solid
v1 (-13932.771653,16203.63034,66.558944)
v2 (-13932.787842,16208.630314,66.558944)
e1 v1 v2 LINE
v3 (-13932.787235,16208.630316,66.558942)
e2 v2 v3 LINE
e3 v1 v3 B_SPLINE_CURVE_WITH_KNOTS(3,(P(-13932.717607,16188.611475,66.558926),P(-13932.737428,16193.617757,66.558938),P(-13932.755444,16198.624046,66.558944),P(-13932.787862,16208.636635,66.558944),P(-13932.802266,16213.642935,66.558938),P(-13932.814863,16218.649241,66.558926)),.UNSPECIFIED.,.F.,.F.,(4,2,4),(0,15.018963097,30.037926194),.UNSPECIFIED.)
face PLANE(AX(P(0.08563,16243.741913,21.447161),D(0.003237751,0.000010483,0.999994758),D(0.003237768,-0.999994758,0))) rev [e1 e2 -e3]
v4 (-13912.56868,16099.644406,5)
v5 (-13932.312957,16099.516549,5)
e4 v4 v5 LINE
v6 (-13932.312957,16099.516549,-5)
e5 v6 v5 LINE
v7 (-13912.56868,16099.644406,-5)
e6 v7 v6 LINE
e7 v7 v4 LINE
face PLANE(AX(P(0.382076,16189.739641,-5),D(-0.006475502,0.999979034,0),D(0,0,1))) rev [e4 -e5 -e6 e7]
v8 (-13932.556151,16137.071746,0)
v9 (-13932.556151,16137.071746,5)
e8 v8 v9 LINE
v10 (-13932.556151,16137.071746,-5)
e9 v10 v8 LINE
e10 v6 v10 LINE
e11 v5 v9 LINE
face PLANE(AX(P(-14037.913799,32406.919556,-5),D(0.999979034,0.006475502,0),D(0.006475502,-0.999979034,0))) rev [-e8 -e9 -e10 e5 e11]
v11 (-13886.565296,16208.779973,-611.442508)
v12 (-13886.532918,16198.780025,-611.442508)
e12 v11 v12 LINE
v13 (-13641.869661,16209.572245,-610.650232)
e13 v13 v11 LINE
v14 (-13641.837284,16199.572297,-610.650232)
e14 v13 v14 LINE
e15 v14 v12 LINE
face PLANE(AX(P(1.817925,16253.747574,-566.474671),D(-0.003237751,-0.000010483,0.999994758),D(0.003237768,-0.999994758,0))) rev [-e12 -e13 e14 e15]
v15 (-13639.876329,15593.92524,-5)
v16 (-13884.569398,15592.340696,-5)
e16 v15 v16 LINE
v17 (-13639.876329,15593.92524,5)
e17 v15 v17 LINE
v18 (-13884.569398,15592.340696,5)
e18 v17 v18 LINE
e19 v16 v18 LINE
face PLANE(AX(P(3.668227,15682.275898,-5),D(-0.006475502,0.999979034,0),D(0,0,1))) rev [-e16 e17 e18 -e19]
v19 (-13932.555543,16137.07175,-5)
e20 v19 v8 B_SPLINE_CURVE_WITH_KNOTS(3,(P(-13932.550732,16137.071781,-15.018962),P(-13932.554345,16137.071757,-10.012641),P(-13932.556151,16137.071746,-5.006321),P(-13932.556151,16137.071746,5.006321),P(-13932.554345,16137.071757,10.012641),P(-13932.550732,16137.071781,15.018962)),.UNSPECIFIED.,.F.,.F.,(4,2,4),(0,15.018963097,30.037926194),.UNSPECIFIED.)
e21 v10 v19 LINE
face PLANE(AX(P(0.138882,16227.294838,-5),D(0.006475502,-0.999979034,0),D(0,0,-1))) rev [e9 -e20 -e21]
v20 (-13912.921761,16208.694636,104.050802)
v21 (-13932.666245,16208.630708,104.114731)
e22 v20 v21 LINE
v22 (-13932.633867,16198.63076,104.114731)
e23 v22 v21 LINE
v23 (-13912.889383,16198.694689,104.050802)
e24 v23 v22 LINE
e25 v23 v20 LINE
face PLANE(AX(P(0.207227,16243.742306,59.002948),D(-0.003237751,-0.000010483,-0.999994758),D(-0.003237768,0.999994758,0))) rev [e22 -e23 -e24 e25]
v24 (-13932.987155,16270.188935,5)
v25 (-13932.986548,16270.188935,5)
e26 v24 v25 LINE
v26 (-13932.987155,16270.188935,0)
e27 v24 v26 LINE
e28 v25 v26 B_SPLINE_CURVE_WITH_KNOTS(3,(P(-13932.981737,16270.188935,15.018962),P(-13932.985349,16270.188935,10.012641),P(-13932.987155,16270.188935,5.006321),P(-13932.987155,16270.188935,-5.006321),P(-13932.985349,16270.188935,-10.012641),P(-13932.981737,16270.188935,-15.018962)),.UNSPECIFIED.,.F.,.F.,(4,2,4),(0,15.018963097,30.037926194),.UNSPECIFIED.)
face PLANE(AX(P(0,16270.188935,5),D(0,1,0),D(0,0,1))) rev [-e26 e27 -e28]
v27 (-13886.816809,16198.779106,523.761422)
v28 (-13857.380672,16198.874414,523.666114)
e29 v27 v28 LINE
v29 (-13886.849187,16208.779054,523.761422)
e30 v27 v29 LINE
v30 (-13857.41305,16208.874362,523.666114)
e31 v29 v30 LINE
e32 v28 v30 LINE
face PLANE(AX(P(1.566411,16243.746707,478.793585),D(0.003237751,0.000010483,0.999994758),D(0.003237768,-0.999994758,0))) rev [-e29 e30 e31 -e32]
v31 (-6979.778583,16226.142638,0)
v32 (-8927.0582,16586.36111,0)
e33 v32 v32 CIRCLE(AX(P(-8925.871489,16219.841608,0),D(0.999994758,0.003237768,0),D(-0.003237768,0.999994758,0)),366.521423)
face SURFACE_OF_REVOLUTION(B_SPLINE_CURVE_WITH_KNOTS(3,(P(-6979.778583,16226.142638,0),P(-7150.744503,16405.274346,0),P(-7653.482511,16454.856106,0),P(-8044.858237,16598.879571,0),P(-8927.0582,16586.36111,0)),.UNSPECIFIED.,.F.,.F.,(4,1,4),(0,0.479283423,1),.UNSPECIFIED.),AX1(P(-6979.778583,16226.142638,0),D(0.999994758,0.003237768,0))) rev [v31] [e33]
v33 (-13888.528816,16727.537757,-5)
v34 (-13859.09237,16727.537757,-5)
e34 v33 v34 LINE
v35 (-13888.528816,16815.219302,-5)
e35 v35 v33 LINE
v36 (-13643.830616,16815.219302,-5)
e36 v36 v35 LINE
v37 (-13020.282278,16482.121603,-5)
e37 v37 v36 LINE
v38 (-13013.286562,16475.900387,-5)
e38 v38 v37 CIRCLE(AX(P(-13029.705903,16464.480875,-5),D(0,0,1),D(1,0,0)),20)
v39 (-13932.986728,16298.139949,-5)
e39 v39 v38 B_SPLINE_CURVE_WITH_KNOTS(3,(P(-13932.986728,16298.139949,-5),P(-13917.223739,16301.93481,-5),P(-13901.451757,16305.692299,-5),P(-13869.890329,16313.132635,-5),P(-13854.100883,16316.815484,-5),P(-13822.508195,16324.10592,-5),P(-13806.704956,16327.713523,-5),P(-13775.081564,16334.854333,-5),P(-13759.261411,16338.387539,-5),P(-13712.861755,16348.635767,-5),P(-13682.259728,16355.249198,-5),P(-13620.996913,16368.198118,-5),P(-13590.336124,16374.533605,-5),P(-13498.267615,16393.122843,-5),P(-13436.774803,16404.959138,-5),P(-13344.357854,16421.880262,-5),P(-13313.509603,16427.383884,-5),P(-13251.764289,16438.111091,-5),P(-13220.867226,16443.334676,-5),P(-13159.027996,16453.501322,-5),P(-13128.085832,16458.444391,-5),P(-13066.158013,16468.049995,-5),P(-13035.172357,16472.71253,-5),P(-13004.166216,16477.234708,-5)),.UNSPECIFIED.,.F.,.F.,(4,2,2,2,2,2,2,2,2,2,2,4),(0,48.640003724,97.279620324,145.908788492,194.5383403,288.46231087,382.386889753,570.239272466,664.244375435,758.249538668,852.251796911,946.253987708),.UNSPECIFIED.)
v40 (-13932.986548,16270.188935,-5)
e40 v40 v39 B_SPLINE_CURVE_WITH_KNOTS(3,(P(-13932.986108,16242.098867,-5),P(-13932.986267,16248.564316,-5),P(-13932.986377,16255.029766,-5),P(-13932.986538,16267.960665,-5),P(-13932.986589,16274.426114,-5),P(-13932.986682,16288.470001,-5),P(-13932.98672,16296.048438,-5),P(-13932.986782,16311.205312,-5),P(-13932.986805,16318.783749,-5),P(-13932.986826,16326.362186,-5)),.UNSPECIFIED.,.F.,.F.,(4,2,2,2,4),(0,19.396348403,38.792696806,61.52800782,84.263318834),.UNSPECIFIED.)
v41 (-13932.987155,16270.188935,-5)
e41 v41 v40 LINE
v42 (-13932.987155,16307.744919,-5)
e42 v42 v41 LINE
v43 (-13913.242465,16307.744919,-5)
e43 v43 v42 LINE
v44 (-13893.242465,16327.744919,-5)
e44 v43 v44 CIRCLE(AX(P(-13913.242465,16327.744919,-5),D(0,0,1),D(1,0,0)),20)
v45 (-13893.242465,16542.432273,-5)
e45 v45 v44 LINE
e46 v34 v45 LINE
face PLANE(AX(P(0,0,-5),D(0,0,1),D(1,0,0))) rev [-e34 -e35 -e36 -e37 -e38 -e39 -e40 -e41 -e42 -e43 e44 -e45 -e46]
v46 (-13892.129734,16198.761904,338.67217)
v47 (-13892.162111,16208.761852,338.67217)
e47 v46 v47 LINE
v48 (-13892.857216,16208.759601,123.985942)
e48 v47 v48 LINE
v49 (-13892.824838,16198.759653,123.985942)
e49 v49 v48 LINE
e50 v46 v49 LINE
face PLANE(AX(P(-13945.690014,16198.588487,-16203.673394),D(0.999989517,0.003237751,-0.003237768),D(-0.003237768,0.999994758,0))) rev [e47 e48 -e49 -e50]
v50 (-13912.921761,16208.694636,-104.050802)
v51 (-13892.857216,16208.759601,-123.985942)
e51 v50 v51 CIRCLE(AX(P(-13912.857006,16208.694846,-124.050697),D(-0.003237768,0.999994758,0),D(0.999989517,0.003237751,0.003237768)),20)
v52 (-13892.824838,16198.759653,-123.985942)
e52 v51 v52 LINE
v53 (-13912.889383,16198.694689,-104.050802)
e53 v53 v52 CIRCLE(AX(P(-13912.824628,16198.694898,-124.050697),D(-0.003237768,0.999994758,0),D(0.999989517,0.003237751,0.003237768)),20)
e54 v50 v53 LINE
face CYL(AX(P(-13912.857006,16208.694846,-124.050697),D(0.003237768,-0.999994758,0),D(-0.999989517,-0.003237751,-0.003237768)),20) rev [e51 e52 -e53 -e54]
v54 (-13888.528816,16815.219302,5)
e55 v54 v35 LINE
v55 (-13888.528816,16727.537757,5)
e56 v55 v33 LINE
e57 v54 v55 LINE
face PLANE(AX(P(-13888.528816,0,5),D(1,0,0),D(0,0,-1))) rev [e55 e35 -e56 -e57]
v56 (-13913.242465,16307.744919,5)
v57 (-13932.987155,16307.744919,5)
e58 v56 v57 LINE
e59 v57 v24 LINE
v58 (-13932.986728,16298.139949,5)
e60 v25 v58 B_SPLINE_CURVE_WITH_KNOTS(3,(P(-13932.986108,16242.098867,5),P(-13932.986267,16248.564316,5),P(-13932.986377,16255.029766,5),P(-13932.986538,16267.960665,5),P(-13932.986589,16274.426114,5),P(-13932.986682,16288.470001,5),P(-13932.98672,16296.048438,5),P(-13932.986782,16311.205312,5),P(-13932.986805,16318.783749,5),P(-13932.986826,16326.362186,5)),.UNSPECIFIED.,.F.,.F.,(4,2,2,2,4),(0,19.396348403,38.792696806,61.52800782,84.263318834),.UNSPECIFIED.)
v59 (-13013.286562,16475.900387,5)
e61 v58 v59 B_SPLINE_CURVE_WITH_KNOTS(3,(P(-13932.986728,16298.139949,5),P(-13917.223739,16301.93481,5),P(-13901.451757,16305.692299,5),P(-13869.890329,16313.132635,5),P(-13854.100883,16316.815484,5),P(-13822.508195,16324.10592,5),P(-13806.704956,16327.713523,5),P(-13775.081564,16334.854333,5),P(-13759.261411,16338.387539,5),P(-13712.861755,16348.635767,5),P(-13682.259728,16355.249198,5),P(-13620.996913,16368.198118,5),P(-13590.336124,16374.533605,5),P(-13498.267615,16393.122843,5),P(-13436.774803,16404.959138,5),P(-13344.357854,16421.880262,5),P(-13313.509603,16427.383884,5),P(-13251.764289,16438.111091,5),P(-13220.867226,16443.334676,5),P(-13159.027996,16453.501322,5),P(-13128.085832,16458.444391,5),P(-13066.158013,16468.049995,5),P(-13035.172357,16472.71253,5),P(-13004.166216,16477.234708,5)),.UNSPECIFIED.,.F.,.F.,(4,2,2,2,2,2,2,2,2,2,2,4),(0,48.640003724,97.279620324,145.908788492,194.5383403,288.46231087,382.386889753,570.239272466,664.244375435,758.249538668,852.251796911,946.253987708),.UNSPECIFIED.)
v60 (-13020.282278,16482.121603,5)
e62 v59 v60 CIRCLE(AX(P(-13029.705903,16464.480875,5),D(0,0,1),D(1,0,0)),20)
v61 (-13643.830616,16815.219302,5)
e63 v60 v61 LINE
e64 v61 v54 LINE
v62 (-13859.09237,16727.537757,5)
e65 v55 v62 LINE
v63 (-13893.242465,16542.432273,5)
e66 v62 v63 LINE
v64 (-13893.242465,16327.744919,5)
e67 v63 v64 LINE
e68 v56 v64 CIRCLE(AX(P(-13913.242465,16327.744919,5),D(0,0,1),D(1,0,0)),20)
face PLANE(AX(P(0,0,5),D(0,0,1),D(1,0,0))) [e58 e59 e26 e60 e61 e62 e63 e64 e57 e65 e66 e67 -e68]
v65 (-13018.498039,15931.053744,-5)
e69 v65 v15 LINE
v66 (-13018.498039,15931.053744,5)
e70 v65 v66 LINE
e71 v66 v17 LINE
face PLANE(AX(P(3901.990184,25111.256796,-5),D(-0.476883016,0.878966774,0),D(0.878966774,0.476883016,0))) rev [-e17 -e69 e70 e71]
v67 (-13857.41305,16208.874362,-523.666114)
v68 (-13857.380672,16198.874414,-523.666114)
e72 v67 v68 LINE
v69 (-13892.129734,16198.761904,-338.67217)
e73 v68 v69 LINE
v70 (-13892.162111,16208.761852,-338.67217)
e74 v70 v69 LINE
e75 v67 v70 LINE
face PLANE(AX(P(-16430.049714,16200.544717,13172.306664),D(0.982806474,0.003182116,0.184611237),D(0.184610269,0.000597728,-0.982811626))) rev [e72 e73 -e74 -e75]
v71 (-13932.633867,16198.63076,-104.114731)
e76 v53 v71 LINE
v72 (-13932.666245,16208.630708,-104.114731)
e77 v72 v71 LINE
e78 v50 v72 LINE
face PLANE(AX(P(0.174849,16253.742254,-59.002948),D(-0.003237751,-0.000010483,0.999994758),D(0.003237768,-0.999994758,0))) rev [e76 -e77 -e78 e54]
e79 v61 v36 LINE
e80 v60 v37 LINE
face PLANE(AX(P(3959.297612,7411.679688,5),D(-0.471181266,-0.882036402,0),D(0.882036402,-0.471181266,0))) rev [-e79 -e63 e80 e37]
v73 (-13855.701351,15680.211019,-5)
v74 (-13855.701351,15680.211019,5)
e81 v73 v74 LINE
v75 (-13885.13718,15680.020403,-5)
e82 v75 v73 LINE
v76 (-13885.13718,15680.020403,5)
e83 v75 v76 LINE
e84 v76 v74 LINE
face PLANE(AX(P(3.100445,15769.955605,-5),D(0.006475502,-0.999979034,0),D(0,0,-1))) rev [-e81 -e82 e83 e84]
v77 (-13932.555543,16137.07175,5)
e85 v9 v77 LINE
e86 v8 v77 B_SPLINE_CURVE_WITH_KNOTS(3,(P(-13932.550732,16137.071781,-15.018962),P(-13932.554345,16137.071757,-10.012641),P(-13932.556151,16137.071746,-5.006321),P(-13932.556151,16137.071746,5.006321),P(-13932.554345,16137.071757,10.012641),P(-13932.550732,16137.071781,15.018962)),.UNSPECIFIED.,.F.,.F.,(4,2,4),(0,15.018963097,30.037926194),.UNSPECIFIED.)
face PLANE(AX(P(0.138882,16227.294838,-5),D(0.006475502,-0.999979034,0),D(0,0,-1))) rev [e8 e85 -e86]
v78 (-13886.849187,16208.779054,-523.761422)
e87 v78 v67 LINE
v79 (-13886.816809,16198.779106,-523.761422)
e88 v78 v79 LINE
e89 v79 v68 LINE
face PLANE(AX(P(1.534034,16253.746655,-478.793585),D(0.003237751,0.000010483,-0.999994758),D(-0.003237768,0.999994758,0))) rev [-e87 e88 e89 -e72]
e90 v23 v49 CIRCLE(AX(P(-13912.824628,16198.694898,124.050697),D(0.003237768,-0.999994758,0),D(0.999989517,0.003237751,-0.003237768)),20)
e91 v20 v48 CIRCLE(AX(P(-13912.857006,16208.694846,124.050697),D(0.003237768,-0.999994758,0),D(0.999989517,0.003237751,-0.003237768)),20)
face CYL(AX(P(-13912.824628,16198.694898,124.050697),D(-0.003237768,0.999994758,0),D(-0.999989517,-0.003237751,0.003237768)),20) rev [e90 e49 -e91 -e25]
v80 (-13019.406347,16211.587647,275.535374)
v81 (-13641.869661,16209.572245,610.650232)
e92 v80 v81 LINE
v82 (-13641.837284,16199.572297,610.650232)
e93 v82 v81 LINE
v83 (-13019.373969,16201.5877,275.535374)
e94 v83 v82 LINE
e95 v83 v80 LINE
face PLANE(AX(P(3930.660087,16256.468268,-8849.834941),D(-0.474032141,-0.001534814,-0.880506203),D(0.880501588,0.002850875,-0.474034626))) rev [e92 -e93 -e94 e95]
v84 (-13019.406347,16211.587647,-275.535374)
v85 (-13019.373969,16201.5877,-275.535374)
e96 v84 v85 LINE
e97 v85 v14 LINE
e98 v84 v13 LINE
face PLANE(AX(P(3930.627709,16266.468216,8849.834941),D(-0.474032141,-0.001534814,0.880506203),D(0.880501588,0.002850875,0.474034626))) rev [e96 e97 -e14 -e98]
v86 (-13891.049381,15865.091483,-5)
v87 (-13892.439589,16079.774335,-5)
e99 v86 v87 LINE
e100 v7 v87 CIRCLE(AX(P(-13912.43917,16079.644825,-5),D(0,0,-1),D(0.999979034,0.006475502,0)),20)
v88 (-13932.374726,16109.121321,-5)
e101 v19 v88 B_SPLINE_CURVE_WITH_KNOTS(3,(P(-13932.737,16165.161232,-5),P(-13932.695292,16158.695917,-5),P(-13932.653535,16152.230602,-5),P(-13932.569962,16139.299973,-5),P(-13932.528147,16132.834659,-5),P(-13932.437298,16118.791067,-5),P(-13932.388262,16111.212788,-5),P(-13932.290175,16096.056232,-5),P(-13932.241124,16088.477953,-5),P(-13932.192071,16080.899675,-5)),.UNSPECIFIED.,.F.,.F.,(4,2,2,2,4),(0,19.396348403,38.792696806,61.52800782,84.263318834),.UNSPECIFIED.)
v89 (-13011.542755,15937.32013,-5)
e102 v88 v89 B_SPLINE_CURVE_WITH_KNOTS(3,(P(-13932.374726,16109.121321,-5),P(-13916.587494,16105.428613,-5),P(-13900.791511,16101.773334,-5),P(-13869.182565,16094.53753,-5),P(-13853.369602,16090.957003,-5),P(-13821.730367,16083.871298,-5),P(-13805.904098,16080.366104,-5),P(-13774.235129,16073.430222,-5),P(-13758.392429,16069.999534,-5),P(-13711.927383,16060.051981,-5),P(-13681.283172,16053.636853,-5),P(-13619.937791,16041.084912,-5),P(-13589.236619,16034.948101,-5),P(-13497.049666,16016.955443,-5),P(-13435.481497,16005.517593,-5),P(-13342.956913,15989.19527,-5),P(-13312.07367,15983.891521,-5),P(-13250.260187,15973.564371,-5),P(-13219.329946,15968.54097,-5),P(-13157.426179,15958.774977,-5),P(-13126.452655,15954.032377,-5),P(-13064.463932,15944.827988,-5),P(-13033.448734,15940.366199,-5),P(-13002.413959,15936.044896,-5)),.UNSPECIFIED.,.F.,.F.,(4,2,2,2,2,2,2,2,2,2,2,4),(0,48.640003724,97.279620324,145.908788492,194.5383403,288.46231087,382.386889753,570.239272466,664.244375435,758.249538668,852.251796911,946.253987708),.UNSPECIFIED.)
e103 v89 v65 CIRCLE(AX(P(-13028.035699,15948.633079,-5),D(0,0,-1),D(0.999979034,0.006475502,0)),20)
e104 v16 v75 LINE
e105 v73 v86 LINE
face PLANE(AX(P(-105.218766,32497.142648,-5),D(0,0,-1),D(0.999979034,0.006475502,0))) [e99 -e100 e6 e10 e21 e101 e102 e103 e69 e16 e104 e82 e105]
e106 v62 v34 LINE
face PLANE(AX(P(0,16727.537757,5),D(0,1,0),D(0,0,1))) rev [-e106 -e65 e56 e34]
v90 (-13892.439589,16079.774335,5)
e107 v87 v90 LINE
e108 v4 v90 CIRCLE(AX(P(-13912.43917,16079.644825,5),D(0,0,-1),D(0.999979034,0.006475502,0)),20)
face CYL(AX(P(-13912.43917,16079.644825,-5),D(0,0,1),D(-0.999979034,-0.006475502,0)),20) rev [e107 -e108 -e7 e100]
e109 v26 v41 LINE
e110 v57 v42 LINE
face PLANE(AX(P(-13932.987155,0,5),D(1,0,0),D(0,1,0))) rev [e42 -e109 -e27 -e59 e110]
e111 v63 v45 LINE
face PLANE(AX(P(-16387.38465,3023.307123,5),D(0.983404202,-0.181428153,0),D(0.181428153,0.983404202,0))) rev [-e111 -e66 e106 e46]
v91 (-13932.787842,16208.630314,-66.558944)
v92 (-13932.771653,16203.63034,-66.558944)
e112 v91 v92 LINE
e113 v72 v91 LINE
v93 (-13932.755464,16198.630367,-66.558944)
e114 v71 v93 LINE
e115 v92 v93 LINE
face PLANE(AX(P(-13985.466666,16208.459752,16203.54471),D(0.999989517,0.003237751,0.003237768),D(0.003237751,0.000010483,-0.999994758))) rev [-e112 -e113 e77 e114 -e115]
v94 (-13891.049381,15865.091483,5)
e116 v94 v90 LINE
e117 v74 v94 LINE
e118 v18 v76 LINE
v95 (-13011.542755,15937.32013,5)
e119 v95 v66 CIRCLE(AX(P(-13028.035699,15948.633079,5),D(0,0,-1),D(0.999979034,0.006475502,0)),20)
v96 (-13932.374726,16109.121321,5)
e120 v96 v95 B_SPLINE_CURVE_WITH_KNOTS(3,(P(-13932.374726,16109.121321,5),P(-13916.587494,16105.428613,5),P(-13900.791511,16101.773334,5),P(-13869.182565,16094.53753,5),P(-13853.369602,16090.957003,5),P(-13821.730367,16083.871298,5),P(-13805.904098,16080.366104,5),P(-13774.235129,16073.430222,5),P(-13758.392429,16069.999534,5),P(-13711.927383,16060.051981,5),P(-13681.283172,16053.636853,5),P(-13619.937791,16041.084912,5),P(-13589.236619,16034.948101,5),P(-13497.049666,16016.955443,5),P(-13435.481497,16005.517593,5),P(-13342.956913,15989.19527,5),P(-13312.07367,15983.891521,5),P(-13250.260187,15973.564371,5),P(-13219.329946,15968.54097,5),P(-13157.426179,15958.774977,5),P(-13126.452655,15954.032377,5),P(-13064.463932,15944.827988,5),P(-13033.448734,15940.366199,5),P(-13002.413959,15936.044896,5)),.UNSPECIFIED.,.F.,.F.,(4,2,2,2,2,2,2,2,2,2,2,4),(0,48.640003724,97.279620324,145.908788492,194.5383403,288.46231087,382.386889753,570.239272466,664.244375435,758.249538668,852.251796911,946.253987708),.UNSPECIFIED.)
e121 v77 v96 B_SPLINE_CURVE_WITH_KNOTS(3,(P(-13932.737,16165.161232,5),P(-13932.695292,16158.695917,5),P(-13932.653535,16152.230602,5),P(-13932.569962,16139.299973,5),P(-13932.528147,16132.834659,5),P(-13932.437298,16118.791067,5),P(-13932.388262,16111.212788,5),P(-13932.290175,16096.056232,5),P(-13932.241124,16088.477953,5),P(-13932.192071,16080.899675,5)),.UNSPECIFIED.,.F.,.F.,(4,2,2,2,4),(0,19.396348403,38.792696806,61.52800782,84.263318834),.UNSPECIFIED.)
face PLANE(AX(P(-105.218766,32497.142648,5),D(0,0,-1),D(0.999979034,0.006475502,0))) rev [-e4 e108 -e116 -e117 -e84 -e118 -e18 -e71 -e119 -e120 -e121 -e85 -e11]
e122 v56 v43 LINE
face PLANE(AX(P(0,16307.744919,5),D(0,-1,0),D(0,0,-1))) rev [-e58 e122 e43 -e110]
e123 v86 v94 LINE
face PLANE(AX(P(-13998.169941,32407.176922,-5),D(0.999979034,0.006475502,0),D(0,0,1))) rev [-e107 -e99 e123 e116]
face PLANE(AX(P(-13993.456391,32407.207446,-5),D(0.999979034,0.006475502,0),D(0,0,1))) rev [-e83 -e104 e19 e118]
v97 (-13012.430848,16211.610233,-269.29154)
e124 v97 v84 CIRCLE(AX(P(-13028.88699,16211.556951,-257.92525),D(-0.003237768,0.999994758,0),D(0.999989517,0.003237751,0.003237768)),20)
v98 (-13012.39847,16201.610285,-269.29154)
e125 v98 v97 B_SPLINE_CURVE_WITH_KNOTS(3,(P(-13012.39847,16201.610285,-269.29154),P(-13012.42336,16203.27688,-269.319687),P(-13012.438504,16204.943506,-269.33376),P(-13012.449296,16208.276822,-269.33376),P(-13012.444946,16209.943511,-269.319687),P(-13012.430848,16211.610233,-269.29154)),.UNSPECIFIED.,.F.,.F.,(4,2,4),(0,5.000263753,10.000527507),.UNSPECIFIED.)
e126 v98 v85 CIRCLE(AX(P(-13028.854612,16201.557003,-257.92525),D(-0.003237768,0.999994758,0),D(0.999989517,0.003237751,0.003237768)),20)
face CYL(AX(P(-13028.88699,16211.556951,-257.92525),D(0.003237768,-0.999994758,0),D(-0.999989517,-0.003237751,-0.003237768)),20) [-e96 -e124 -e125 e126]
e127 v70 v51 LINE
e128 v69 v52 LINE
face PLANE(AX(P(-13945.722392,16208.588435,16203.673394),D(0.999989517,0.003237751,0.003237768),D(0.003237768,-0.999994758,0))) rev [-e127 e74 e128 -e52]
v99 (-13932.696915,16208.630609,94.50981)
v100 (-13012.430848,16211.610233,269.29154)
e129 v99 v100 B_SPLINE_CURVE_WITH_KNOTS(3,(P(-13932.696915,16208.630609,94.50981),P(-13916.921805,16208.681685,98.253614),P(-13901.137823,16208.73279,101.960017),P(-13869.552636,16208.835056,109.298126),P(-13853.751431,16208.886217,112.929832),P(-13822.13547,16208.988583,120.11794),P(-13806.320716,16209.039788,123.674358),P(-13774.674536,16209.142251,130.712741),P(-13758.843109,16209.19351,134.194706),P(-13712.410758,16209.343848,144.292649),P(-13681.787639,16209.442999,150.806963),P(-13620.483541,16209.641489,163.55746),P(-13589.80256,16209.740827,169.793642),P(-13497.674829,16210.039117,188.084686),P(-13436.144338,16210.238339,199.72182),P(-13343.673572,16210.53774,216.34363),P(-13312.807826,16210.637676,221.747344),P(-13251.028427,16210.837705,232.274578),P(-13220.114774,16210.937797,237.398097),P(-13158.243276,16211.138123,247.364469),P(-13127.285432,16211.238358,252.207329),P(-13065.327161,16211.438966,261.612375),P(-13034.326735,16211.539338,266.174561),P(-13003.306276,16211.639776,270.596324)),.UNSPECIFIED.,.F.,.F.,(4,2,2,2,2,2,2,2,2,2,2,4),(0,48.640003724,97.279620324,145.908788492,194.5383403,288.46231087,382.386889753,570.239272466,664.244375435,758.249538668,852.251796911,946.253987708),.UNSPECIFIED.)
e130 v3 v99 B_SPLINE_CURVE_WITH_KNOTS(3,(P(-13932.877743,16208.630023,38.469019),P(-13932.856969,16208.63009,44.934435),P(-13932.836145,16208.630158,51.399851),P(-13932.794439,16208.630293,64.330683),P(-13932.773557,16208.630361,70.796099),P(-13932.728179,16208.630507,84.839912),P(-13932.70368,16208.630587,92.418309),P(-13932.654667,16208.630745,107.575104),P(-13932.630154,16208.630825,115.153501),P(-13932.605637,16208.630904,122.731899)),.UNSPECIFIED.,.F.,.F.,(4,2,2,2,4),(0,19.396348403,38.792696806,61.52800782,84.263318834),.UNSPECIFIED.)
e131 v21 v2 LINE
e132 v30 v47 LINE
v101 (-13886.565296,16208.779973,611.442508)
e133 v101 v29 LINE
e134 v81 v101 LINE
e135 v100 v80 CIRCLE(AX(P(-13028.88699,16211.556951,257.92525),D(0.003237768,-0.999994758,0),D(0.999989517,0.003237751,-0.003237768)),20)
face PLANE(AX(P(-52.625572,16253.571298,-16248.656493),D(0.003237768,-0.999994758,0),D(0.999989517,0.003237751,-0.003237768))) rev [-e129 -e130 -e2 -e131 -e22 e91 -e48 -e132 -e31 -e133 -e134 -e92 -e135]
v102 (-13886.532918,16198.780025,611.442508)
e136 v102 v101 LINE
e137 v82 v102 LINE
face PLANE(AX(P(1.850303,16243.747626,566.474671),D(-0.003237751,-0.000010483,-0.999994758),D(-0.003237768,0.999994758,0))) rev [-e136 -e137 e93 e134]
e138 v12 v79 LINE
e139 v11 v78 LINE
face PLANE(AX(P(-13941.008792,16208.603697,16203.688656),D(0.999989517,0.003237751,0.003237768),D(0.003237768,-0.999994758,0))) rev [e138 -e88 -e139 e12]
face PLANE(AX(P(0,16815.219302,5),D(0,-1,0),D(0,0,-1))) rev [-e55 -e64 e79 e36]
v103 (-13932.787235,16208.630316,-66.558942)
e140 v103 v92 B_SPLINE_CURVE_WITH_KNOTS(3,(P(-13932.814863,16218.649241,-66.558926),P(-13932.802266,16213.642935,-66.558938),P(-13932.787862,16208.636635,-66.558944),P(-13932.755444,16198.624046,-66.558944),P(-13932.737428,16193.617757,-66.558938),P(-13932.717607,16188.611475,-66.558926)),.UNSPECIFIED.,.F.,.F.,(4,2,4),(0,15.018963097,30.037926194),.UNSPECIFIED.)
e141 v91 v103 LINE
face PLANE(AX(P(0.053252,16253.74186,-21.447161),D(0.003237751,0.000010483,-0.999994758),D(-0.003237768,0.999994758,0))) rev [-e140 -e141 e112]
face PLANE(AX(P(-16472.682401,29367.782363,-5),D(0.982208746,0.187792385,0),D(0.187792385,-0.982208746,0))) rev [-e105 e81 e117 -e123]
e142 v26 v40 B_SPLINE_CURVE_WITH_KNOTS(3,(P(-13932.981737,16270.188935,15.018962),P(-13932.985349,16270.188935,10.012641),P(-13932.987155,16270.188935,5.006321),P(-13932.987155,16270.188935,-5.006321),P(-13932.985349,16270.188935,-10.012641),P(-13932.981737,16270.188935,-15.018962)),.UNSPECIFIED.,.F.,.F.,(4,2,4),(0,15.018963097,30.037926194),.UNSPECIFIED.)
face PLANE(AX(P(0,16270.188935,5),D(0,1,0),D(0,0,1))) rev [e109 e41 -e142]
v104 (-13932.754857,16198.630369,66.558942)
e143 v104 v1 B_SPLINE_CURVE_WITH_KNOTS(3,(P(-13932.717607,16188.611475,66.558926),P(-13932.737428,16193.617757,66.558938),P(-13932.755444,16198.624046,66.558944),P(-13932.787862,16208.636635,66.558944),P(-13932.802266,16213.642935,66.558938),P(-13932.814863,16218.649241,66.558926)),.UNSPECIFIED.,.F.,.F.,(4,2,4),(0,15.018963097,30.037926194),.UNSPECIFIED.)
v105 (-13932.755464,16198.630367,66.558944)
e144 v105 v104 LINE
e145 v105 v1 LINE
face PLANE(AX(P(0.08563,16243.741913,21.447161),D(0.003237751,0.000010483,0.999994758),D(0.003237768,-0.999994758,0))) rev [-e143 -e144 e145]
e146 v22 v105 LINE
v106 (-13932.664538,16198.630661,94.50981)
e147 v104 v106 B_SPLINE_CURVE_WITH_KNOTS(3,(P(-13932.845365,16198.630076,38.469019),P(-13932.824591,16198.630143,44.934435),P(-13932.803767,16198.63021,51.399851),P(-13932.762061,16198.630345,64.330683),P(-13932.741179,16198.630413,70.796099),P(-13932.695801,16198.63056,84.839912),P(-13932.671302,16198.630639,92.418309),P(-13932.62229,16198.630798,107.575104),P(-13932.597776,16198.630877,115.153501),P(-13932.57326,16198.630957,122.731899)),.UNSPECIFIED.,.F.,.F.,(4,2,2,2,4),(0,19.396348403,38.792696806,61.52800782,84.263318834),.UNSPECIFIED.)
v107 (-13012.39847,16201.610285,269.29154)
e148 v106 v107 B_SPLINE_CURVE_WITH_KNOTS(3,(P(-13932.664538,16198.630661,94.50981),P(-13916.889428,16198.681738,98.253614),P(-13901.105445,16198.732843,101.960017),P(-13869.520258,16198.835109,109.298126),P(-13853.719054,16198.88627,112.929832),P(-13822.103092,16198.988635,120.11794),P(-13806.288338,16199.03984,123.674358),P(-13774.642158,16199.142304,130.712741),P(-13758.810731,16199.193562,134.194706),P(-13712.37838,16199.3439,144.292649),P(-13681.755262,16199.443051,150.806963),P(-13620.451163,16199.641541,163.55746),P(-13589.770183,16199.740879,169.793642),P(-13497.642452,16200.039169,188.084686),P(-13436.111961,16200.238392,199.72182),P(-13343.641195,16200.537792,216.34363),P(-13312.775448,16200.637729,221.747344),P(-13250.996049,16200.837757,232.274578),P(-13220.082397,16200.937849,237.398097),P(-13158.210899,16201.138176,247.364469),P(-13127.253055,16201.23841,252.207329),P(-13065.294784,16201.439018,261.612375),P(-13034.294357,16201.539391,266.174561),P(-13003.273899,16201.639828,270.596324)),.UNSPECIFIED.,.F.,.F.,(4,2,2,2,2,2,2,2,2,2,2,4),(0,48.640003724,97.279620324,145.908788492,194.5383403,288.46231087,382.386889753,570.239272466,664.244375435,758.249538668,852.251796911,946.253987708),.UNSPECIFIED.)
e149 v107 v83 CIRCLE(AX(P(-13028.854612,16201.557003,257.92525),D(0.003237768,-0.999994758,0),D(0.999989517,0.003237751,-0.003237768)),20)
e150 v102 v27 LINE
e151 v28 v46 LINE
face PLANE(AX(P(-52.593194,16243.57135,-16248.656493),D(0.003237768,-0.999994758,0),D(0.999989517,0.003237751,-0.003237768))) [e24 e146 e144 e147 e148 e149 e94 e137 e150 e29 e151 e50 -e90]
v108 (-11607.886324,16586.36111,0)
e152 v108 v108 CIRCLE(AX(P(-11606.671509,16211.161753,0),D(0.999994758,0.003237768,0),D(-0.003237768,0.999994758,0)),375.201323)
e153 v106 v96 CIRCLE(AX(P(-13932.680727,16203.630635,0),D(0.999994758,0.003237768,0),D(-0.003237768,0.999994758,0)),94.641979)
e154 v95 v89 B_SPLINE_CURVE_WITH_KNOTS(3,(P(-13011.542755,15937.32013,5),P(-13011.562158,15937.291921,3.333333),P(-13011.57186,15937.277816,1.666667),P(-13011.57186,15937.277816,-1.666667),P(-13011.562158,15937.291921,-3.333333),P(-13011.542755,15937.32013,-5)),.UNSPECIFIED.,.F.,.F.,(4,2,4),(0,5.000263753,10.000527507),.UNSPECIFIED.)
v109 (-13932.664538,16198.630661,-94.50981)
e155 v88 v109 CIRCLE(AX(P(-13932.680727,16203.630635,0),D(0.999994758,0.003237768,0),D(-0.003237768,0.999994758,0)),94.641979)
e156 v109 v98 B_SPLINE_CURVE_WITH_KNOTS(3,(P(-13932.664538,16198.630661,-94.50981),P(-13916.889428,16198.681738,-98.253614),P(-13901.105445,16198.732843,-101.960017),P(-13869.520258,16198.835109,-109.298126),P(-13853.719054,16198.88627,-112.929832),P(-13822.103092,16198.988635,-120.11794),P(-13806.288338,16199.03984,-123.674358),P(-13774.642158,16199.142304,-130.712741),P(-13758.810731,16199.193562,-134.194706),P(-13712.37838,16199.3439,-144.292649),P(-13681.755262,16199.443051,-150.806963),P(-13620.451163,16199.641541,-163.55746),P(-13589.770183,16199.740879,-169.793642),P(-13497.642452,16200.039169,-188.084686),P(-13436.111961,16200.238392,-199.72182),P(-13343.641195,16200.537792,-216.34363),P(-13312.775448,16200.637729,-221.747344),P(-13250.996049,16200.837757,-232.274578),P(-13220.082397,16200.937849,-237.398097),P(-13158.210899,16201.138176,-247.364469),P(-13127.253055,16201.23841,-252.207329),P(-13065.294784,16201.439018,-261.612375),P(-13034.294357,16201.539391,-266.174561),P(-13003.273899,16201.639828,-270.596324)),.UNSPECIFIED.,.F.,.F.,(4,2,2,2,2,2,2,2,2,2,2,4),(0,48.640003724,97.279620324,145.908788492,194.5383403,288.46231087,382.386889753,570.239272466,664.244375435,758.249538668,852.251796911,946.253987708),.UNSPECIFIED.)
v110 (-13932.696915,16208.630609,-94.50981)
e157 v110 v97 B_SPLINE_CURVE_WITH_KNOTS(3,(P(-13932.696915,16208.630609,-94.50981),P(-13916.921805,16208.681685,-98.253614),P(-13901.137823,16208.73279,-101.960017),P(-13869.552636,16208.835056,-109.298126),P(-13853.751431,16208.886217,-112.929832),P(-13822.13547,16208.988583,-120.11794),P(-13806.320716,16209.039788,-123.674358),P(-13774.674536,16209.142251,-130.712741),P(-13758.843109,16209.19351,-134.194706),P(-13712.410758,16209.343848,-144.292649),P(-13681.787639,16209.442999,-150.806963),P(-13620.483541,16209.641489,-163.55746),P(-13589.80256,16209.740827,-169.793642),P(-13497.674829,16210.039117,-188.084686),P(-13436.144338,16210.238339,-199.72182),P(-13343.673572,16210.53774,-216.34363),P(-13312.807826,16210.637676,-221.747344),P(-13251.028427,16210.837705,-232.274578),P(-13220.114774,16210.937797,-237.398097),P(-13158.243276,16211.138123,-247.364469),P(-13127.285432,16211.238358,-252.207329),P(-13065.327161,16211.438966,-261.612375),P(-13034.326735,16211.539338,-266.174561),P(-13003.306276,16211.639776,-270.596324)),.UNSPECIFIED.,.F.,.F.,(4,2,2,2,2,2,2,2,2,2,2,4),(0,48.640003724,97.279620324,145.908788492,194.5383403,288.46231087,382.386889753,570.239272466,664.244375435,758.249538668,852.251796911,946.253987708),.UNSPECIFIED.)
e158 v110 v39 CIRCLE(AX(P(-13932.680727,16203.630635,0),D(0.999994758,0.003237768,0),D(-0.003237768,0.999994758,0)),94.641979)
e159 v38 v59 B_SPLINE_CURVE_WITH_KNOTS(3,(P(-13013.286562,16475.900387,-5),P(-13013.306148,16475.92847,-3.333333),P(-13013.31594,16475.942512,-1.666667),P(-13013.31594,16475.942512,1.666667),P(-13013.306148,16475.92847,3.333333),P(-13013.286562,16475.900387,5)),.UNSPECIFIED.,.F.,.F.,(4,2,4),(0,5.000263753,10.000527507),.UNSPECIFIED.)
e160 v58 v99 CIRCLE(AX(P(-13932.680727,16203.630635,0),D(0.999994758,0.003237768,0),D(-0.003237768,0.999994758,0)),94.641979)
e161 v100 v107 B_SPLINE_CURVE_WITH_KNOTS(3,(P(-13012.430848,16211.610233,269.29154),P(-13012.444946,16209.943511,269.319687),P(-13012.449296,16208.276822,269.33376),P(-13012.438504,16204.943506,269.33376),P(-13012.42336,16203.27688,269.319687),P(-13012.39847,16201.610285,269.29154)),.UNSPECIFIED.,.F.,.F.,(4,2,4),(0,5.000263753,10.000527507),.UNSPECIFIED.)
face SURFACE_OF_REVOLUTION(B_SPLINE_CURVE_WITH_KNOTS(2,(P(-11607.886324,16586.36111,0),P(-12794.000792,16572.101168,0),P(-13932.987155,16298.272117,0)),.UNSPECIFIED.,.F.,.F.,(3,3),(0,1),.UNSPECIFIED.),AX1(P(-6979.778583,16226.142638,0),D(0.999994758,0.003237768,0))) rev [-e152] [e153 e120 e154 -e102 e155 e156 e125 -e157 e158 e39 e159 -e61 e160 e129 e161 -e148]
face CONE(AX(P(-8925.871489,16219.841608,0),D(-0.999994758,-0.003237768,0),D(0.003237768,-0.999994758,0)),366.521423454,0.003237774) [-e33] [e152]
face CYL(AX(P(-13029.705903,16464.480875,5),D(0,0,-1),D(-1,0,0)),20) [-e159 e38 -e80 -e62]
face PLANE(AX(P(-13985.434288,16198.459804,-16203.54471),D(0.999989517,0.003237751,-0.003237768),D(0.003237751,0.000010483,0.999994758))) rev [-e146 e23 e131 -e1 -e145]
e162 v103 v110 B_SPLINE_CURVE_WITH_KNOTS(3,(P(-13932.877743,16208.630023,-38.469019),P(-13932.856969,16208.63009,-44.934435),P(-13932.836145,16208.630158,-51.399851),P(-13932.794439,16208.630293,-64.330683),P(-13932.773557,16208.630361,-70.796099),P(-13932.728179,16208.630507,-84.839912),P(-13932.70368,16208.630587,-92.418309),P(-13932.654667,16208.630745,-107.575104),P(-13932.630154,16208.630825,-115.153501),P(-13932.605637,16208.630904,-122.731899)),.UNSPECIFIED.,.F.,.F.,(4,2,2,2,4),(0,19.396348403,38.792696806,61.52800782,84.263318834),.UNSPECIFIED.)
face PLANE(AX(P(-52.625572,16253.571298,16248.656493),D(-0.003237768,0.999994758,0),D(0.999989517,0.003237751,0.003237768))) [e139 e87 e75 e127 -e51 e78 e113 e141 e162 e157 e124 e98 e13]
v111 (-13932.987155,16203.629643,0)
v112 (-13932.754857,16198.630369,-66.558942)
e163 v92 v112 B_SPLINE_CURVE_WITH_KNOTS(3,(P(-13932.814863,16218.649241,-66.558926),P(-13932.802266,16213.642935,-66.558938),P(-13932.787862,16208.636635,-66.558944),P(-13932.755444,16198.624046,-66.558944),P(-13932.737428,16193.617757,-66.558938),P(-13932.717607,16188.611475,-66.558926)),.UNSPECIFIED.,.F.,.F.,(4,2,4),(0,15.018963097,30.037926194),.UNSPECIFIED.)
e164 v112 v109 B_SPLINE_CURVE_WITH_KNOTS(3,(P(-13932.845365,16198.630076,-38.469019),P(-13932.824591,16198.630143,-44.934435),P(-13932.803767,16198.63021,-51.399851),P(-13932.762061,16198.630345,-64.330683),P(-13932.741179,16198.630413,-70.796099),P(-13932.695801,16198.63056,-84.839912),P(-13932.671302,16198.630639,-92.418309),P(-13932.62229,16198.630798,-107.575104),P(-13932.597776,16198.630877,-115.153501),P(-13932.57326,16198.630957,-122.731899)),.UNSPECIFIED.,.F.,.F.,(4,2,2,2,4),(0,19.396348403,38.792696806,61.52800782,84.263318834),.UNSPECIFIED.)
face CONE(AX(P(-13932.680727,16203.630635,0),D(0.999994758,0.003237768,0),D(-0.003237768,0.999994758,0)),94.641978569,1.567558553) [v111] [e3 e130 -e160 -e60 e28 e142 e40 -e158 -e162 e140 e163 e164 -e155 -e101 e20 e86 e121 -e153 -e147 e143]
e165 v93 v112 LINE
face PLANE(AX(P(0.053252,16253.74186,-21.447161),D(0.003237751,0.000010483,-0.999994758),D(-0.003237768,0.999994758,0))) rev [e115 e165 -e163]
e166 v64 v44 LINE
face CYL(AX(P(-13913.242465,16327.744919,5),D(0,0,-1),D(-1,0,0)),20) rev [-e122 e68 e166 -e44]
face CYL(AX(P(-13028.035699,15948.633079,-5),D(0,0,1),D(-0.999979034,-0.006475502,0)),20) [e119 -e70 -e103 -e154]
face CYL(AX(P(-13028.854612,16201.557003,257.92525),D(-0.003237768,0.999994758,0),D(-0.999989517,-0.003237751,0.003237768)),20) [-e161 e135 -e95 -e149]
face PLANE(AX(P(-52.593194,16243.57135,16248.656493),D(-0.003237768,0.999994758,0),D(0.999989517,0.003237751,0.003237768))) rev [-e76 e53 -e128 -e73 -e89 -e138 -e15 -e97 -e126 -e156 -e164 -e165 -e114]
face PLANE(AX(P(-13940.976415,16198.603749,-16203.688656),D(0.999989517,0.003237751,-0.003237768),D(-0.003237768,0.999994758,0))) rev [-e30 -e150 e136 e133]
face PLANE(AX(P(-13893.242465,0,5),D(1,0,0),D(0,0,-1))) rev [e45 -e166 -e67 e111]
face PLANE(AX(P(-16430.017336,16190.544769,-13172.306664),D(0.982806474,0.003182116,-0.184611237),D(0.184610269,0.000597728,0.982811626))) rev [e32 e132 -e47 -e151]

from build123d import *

# Parameters (mm, degrees)
BOSS_EXTRUDE7_START       = 16270.18893537
BOSS_EXTRUDE7_OUTLINE_W   = 44.458339497
BOSS_EXTRUDE7_OUTLINE_H   = 10
BOSS_EXTRUDE7_DEPTH       = 37.555983991
BOSS_EXTRUDE7_START_2     = 16307.744919361
BOSS_EXTRUDE7_2_OUTLINE_W = 4.71364866
BOSS_EXTRUDE7_2_OUTLINE_H = 10
BOSS_EXTRUDE7_2_DEPTH     = 234.687353232
BOSS_EXTRUDE7_START_3     = -5
BOSS_EXTRUDE7_3_DEPTH     = 10
CIRPATTERN13_COUNT        = 4


with BuildPart() as part:
    # Sketch1 → Revolve1 (revolve)
    with BuildSketch(Plane.XY):
        with BuildLine():
            Line((-8927.058200196, 16586.361109833), (-11607.886324288, 16586.361109833))
            add(Edge.make_bspline(
                [(-11607.886324288, 16586.361109833), (-12794.00079163, 16572.101167552), (-13932.987155433, 16298.272117393)],
                knots=[0, 0, 0, 1, 1, 1], degree=2))
            Line((-13932.987155433, 16298.272117393), (-13932.987155433, 16203.629642747))
            Line((-13932.987155433, 16203.629642747), (-6979.778583019, 16226.142638256))
            add(Edge.make_bspline(
                [(-6979.778583019, 16226.142638256), (-7150.744503464, 16405.274346255), (-7653.482511182, 16454.856105961), (-8044.85823717, 16598.87957134), (-8927.058200196, 16586.361109833)],
                knots=[0, 0, 0, 0, 0.479283423, 1, 1, 1, 1], degree=3))
        make_face()
    revolve(axis=Axis((-6979.778583019, 16226.142638256, 0), (-0.9999947584148503, -0.0032377681858395966, 0)))

    # Boss-Extrude7: read off the stored shape, not the designer's step
    # Boss-Extrude7 outline → Boss-Extrude7 (add)
    with BuildSketch(Plane(origin=(0, 0, 0), x_dir=(1, 0, 0), z_dir=(0, 1, 0)).offset(BOSS_EXTRUDE7_START)):
        with Locations((-13910.757985685, 0)):
            Rectangle(BOSS_EXTRUDE7_OUTLINE_W, BOSS_EXTRUDE7_OUTLINE_H)
    boss_extrude7 = extrude(amount=BOSS_EXTRUDE7_DEPTH)

    # Boss-Extrude7 2 outline → Boss-Extrude7 2 (add)
    with BuildSketch(Plane(origin=(0, 0, 0), x_dir=(1, 0, 0), z_dir=(0, 1, 0)).offset(BOSS_EXTRUDE7_START_2)):
        with Locations((-13890.885640266, 0)):
            Rectangle(BOSS_EXTRUDE7_2_OUTLINE_W, BOSS_EXTRUDE7_2_OUTLINE_H)
    boss_extrude7_2 = extrude(amount=BOSS_EXTRUDE7_2_DEPTH)

    # Boss-Extrude7 3 outline → Boss-Extrude7 3 (add)
    with BuildSketch(Plane.XY.offset(BOSS_EXTRUDE7_START_3)):
        with BuildLine():
            ThreePointArc((-13013.286562324, 16475.90038698), (-13016.415282103, 16479.426088343), (-13020.282277859, 16482.121603392))
            Line((-13020.282277859, 16482.121603392), (-13643.830616351, 16815.219302052))
            Line((-13643.830616351, 16815.219302052), (-13888.528815936, 16815.219302052))
            Line((-13888.528815936, 16815.219302052), (-13888.528815936, 16727.537756869))
            Line((-13888.528815936, 16727.537756869), (-13859.092370421, 16727.537756869))
            Line((-13859.092370421, 16727.537756869), (-13893.242464596, 16542.432272593))
            Line((-13893.242464596, 16542.432272593), (-13893.242464596, 16327.744919361))
            ThreePointArc((-13893.242464596, 16327.744919361), (-13899.100328972, 16313.602783737), (-13913.242464596, 16307.744919361))
            Line((-13913.242464596, 16307.744919361), (-13012, 16307.744919361))
            Line((-13012, 16307.744919361), (-13012, 16474.050526318))
            Line((-13012, 16474.050526318), (-13013.286562324, 16475.90038698))
        make_face()
    boss_extrude7_3 = extrude(amount=BOSS_EXTRUDE7_3_DEPTH)

    # CirPattern13: Boss-Extrude7, Boss-Extrude7 2, Boss-Extrude7 3 ×4 about axis
    cirpattern13_axis = Axis((-52.609383054, 16248.571323872, 0), (-0.9999947584148503, -0.0032377681858406513, 0))
    add([boss_extrude7.rotate(cirpattern13_axis, i * 360 / CIRPATTERN13_COUNT) for i in range(1, CIRPATTERN13_COUNT)])
    add([boss_extrude7_2.rotate(cirpattern13_axis, i * 360 / CIRPATTERN13_COUNT) for i in range(1, CIRPATTERN13_COUNT)])
    add([boss_extrude7_3.rotate(cirpattern13_axis, i * 360 / CIRPATTERN13_COUNT) for i in range(1, CIRPATTERN13_COUNT)])


solid = part.part
